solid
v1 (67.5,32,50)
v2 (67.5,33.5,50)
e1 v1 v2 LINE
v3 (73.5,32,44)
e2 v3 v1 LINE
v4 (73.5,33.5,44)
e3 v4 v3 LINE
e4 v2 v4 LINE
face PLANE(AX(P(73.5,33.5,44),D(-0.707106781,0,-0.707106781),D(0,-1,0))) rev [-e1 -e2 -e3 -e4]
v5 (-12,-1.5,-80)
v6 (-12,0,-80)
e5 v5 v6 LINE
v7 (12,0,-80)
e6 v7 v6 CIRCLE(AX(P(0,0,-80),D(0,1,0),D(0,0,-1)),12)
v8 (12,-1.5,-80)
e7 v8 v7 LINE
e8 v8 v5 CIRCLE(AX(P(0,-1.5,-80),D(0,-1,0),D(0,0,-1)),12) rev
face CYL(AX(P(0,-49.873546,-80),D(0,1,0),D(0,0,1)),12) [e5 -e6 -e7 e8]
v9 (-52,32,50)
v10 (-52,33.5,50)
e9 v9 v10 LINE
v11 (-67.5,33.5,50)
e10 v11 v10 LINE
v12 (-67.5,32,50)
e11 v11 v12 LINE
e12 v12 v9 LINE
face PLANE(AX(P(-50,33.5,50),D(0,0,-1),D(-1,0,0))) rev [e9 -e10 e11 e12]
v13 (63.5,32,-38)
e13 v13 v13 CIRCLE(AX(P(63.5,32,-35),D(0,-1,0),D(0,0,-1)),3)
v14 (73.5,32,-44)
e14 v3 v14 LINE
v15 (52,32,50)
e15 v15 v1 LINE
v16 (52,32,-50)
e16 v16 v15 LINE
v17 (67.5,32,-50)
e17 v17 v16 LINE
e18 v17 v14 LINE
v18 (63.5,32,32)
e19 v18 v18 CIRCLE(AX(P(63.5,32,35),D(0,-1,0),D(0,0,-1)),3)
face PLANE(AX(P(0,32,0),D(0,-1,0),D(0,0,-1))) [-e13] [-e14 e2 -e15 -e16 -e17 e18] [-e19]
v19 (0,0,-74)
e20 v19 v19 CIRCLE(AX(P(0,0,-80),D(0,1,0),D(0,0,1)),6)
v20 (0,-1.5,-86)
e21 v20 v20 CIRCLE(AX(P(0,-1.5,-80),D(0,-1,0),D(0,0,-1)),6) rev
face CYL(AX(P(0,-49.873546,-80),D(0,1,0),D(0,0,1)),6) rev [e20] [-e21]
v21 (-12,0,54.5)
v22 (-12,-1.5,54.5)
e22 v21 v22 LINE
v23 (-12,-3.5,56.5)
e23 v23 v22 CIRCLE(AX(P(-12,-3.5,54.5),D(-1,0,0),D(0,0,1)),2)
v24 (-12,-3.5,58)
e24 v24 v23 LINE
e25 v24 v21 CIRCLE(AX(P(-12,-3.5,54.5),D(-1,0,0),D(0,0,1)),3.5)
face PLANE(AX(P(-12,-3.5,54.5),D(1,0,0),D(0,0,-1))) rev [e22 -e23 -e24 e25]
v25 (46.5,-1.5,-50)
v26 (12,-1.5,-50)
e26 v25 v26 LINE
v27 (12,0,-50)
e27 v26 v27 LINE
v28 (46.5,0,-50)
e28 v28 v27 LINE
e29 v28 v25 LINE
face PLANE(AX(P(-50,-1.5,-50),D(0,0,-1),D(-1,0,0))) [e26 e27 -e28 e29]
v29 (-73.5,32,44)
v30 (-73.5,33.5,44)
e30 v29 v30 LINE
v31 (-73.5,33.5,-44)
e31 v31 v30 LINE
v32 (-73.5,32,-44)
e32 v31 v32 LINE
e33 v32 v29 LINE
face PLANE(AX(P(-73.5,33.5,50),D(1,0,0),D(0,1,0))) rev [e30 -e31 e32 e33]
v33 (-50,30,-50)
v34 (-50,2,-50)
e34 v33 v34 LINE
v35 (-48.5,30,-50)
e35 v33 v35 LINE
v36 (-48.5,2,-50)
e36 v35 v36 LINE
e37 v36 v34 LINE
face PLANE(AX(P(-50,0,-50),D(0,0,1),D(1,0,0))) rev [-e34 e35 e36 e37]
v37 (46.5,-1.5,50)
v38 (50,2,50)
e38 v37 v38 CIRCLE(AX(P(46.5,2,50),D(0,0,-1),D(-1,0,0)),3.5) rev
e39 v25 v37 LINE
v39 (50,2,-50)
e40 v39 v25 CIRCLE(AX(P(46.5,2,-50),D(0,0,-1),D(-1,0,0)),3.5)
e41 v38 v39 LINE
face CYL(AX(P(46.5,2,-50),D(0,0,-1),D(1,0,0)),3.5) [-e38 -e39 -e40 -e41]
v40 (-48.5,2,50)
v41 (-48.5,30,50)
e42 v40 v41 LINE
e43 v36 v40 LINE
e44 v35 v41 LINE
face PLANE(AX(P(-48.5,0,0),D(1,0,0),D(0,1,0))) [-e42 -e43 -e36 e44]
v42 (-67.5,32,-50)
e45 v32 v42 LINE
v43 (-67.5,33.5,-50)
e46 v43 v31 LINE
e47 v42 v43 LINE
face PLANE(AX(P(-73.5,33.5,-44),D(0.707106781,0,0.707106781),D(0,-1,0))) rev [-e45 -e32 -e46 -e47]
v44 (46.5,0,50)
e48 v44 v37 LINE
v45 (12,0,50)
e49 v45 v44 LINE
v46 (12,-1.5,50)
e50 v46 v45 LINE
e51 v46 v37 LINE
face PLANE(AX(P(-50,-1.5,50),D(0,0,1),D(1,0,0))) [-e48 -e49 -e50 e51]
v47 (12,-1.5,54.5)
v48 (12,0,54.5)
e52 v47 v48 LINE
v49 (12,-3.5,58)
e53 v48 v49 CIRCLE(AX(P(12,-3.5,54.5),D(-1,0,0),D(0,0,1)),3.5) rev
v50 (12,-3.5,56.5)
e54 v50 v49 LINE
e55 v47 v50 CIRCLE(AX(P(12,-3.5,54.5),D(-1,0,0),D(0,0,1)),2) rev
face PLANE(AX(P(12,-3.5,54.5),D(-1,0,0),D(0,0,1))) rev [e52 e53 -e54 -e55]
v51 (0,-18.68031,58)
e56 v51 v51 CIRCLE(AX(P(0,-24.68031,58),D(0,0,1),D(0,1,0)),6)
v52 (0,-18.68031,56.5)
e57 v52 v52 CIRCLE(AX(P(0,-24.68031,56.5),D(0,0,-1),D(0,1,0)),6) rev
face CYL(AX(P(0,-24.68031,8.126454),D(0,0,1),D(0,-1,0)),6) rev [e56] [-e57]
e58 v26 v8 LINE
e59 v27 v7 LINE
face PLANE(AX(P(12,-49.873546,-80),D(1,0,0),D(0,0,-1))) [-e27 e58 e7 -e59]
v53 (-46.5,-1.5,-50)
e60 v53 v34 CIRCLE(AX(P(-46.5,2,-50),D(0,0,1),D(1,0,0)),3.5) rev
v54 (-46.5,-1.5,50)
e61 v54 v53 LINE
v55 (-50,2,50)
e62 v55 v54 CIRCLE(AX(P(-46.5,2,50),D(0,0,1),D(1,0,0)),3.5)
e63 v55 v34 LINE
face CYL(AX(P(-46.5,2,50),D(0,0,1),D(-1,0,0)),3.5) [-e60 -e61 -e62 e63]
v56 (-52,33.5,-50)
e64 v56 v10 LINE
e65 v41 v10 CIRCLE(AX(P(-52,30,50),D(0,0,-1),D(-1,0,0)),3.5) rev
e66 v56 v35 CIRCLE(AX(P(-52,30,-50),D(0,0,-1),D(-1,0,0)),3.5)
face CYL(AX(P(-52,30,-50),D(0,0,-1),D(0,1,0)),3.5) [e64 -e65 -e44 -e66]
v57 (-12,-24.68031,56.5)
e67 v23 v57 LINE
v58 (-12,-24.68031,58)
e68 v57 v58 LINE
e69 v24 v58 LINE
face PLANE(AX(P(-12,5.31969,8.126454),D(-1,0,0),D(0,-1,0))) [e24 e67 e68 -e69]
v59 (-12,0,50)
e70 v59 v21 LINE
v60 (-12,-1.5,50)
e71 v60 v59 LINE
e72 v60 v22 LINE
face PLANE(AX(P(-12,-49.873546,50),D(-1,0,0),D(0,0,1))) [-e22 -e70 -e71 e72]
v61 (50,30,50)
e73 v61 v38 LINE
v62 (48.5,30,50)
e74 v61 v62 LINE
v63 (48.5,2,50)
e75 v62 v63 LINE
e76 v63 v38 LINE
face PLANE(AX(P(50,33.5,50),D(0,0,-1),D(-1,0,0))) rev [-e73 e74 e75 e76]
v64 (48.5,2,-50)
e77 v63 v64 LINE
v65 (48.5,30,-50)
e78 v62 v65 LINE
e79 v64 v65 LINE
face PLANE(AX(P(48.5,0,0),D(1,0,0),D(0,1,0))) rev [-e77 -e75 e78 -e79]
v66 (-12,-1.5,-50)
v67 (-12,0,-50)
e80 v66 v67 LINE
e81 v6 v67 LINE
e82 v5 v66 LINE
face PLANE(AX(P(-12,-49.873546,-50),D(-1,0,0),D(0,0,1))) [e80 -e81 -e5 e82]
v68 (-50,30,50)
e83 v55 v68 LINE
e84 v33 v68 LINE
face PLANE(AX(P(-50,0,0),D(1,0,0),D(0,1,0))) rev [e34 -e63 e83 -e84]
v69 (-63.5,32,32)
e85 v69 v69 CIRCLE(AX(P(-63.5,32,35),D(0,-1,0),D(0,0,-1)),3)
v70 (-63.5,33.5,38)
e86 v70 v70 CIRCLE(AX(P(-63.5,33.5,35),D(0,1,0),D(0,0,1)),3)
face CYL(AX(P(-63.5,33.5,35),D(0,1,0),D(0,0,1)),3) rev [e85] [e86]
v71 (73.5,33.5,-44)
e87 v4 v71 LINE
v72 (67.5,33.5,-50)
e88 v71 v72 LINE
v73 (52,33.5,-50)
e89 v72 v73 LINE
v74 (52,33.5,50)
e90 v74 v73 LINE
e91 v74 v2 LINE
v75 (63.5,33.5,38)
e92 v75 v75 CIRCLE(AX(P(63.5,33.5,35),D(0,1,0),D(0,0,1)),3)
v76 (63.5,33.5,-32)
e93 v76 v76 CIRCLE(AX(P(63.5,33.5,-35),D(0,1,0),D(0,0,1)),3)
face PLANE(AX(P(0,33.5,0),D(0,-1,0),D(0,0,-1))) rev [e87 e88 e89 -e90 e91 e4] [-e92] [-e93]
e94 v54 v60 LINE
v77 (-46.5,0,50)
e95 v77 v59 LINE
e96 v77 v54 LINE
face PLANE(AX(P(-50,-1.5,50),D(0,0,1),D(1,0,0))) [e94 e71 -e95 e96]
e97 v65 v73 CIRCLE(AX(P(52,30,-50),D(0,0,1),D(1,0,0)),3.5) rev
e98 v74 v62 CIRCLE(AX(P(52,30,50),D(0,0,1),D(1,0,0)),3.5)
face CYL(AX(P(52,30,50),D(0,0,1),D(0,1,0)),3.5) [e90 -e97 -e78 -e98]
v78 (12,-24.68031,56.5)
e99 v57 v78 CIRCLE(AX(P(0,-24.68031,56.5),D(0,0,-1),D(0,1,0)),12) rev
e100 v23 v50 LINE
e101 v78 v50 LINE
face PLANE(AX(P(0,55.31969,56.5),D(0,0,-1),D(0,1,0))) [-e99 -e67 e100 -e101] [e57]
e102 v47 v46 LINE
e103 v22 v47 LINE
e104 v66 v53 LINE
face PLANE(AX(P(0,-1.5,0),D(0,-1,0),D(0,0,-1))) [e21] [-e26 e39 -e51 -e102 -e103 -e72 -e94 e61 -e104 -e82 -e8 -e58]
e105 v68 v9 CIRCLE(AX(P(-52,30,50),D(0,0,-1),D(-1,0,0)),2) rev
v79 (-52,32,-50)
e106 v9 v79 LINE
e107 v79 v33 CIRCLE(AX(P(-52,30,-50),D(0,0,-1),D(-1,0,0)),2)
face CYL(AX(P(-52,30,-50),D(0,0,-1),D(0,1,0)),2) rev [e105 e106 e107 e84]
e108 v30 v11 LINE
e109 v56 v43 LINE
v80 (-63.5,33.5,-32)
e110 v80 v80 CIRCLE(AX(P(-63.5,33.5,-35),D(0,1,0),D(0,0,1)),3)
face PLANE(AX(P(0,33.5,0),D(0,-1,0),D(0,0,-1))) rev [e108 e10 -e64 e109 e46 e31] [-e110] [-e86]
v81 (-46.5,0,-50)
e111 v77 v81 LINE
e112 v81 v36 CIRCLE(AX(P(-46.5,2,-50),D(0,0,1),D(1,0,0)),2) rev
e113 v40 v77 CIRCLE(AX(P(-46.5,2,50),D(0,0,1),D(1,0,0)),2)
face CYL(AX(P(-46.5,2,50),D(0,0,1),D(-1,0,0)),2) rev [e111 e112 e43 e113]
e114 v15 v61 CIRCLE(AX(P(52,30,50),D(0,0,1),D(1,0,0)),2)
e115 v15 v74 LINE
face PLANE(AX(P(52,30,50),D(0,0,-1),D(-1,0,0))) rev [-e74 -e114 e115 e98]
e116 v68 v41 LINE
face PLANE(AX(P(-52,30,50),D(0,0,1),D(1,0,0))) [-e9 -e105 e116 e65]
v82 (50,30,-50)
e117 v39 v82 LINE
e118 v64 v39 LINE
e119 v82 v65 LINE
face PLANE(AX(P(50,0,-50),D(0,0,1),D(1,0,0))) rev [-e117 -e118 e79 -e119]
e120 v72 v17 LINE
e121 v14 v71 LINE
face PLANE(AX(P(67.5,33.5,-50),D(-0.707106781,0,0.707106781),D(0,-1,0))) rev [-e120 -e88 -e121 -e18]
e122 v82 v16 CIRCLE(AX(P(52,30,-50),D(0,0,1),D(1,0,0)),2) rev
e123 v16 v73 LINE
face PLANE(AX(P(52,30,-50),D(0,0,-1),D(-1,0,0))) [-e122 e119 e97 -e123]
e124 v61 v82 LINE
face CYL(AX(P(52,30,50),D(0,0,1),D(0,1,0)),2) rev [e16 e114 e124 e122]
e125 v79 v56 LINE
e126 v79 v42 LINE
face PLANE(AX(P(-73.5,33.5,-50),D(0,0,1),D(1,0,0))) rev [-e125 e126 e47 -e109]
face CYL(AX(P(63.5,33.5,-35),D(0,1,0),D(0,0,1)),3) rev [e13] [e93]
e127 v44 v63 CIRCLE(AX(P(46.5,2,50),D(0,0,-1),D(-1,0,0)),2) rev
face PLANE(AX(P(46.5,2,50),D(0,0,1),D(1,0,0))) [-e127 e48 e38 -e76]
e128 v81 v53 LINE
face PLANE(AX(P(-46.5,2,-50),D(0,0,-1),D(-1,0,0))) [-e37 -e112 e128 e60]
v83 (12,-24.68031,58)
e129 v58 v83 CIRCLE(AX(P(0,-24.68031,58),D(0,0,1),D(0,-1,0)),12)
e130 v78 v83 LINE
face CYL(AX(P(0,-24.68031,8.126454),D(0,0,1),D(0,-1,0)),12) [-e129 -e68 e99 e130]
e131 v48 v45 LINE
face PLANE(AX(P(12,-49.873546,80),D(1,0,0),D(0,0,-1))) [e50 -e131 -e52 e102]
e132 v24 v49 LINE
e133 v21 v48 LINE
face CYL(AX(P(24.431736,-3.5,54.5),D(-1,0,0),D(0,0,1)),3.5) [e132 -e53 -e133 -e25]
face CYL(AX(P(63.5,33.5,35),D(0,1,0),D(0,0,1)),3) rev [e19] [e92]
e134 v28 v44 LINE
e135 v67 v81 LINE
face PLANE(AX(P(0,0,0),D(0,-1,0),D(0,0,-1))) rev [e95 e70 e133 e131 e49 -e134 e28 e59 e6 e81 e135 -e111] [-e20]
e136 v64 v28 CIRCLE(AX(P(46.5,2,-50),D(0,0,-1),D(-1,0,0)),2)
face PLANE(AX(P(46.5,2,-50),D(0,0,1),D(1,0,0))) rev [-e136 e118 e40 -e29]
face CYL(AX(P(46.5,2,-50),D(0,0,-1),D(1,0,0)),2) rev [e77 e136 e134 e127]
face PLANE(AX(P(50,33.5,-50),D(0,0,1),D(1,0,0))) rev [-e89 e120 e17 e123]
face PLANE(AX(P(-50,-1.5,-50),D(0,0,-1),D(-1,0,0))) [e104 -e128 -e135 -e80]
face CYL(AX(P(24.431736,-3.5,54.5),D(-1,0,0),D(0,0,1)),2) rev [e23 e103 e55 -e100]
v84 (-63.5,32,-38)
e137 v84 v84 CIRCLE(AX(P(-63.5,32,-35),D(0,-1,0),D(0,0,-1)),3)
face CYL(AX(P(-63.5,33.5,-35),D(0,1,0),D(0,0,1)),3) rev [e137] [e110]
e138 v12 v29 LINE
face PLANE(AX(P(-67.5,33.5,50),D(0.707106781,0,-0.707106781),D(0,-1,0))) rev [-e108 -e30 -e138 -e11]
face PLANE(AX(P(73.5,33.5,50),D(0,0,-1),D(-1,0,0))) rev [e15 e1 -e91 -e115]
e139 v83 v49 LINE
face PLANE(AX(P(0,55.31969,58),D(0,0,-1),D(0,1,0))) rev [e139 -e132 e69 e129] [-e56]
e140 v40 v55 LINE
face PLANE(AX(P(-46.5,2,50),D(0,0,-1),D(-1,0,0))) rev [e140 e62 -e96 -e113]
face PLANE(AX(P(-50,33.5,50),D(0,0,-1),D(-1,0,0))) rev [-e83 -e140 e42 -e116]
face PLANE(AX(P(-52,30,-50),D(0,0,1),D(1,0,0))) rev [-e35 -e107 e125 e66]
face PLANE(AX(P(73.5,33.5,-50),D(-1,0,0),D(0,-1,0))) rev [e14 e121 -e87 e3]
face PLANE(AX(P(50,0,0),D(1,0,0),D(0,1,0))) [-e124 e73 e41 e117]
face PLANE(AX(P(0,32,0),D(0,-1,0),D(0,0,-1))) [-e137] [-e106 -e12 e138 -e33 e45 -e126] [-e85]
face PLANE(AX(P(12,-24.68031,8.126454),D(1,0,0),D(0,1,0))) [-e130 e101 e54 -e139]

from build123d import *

# Parameters (mm, degrees)
SKETCH1_W                      = 100
SKETCH1_H                      = 100
BASE_FLANGE1_DEPTH             = 1.5
EDGE_FLANGE1_STRIP_W           = 10
EDGE_FLANGE1_STRIP_H           = 1.5
EDGE_FLANGE1_STRIP_CUT_DEPTH   = 100
EDGE_FLANGE1_STRIP_2_W         = 10
EDGE_FLANGE1_STRIP_2_H         = 1.5
EDGE_FLANGE1_STRIP_CUT_2_DEPTH = 100
EDGE_FLANGE1_DEPTH             = 100
EDGE_FLANGE1_BEND_DEPTH        = 100
EDGE_FLANGE2_STRIP_W           = 10
EDGE_FLANGE2_STRIP_H           = 1.5
EDGE_FLANGE2_STRIP_CUT_DEPTH   = 100
EDGE_FLANGE2_STRIP_2_W         = 10
EDGE_FLANGE2_STRIP_2_H         = 1.5
EDGE_FLANGE2_STRIP_CUT_2_DEPTH = 100
EDGE_FLANGE2_DEPTH             = 100
EDGE_FLANGE2_BEND_DEPTH        = 100
F_6_0_6_DIAMETER_HOLE1_D       = 6
CHAMFER1_SIZE                  = 6
SKETCH20_R                     = 6
BOSS_EXTRUDE1_DEPTH            = 1.5
SKETCHED_START                 = 57.64041
SKETCHED_BEND1_OUTLINE_W       = 24
SKETCHED_BEND1_OUTLINE_H       = 1.5
SKETCHED_BEND1_DEPTH           = 35.35959
SKETCHED_START_2               = 54.5
SKETCHED_BEND1_2_OUTLINE_R     = 6
SKETCHED_BEND1_2_DEPTH         = 3.5
SKETCHED_START_3               = -12
SKETCHED_BEND1_3_DEPTH         = 24


with BuildPart() as part:
    # Base-Flange1: sheet metal written as solids
    # Sketch1 → Base-Flange1 (new body)
    with BuildSketch(Plane(origin=(0, 0, 0), x_dir=(1, 0, 0), z_dir=(0, 1, 0))):
        Rectangle(SKETCH1_W, SKETCH1_H)
    extrude(amount=-BASE_FLANGE1_DEPTH)

    # Edge-Flange1: sheet metal written as solids
    # Edge-Flange1 strip (on a plane across the edge) → Edge-Flange1 strip cut (cut)
    with BuildSketch(Plane(origin=(-50, 0, -50), x_dir=(1, 0, 0), z_dir=(0, 0, 1))):
        with Locations((-1.5, -0.75)):
            Rectangle(EDGE_FLANGE1_STRIP_W, EDGE_FLANGE1_STRIP_H)
    extrude(amount=EDGE_FLANGE1_STRIP_CUT_DEPTH, mode=Mode.SUBTRACT)

    # Edge-Flange1 strip 2 (on a plane across the edge) → Edge-Flange1 strip cut 2 (cut)
    with BuildSketch(Plane(origin=(50, 0, 50), x_dir=(-1, 0, 0), z_dir=(0, 0, -1))):
        with Locations((-1.5, -0.75)):
            Rectangle(EDGE_FLANGE1_STRIP_2_W, EDGE_FLANGE1_STRIP_2_H)
    extrude(amount=EDGE_FLANGE1_STRIP_CUT_2_DEPTH, mode=Mode.SUBTRACT)

    # Edge-Flange1 section (on a plane across the edge) → Edge-Flange1 (add)
    with BuildSketch(Plane(origin=(-50, 0, -50), x_dir=(1, 0, 0), z_dir=(0, 0, 1))):
        with BuildLine():
            Line((0, 2), (0, 33.5))
            Line((0, 33.5), (1.5, 33.5))
            Line((1.5, 33.5), (1.5, 2))
            ThreePointArc((1.5, 2), (2.085786438, 0.585786438), (3.5, 0))
            Line((3.5, 0), (3.5, -1.5))
            ThreePointArc((3.5, -1.5), (1.025126266, -0.474873734), (0, 2))
        make_face()
    extrude(amount=EDGE_FLANGE1_DEPTH)

    # Edge-Flange1 section 2 (on a plane across the edge) → Edge-Flange1 bend (add)
    with BuildSketch(Plane(origin=(50, 0, 50), x_dir=(-1, 0, 0), z_dir=(0, 0, -1))):
        with BuildLine():
            Line((0, 2), (0, 33.5))
            Line((0, 33.5), (1.5, 33.5))
            Line((1.5, 33.5), (1.5, 2))
            ThreePointArc((1.5, 2), (2.085786438, 0.585786438), (3.5, 0))
            Line((3.5, 0), (3.5, -1.5))
            ThreePointArc((3.5, -1.5), (1.025126266, -0.474873734), (0, 2))
        make_face()
    extrude(amount=EDGE_FLANGE1_BEND_DEPTH)

    # Edge-Flange2: sheet metal written as solids
    # Edge-Flange2 strip (on a plane across the edge) → Edge-Flange2 strip cut (cut)
    with BuildSketch(Plane(origin=(-50, 33.5, 50), x_dir=(0, -1, 0), z_dir=(0, 0, -1))):
        with Locations((-1.5, -0.75)):
            Rectangle(EDGE_FLANGE2_STRIP_W, EDGE_FLANGE2_STRIP_H)
    extrude(amount=EDGE_FLANGE2_STRIP_CUT_DEPTH, mode=Mode.SUBTRACT)

    # Edge-Flange2 strip 2 (on a plane across the edge) → Edge-Flange2 strip cut 2 (cut)
    with BuildSketch(Plane(origin=(50, 33.5, -50), x_dir=(0, -1, 0), z_dir=(0, 0, 1))):
        with Locations((-1.5, -0.75)):
            Rectangle(EDGE_FLANGE2_STRIP_2_W, EDGE_FLANGE2_STRIP_2_H)
    extrude(amount=EDGE_FLANGE2_STRIP_CUT_2_DEPTH, mode=Mode.SUBTRACT)

    # Edge-Flange2 section (on a plane across the edge) → Edge-Flange2 (add)
    with BuildSketch(Plane(origin=(-50, 33.5, 50), x_dir=(0, -1, 0), z_dir=(0, 0, -1))):
        with BuildLine():
            Line((0, 2), (0, 23.5))
            Line((0, 23.5), (1.5, 23.5))
            Line((1.5, 23.5), (1.5, 2))
            ThreePointArc((1.5, 2), (2.085786438, 0.585786438), (3.5, 0))
            Line((3.5, 0), (3.5, -1.5))
            ThreePointArc((3.5, -1.5), (1.025126266, -0.474873734), (0, 2))
        make_face()
    extrude(amount=EDGE_FLANGE2_DEPTH)

    # Edge-Flange2 section 2 (on a plane across the edge) → Edge-Flange2 bend (add)
    with BuildSketch(Plane(origin=(50, 33.5, -50), x_dir=(0, -1, 0), z_dir=(0, 0, 1))):
        with BuildLine():
            Line((0, 2), (0, 23.5))
            Line((0, 23.5), (1.5, 23.5))
            Line((1.5, 23.5), (1.5, 2))
            ThreePointArc((1.5, 2), (2.085786438, 0.585786438), (3.5, 0))
            Line((3.5, 0), (3.5, -1.5))
            ThreePointArc((3.5, -1.5), (1.025126266, -0.474873734), (0, 2))
        make_face()
    extrude(amount=EDGE_FLANGE2_BEND_DEPTH)

    # Ø6.0 (6) Diameter Hole1 (through all)
    with Locations(Plane(origin=(0, 33.5, 0), x_dir=(1, 0, 0), z_dir=(0, 1, 0))):
        with Locations((-63.5, 35), (-63.5, -35), (63.5, 35), (63.5, -35)):
            Hole(F_6_0_6_DIAMETER_HOLE1_D / 2)

    # Chamfer1
    chamfer1_edges = [part.edges().sort_by_distance(p)[0] for p in [
        (-73.5, 32.75, 50),
        (-73.5, 32.75, -50),
        (73.5, 32.75, -50),
        (73.5, 32.75, 50),
    ]]
    chamfer(chamfer1_edges, length=CHAMFER1_SIZE)

    # Sketch20 → Boss-Extrude1 (add)
    # profile 1 of 2: a face of its own
    with BuildSketch(Plane(origin=(0, 0, 0), x_dir=(1, 0, 0), z_dir=(0, 1, 0))):
        with BuildLine():
            Line((-12, 50), (-12, 80))
            ThreePointArc((-12, 80), (0, 92), (12, 80))
            Line((12, 80), (12, 50))
            Line((12, 50), (-12, 50))
        make_face()
        with Locations(Location((0, 80, 0), (0, 0, 270))):
            Circle(SKETCH20_R, mode=Mode.SUBTRACT)
    # profile 2 of 2: a face of its own
    with BuildSketch(Plane(origin=(0, 0, 0), x_dir=(1, 0, 0), z_dir=(0, 1, 0))):
        with BuildLine():
            Line((12, -50), (-12, -50))
            Line((-12, -50), (-12, -80))
            ThreePointArc((-12, -80), (0, -92), (12, -80))
            Line((12, -80), (12, -50))
        make_face()
        with Locations(Location((0, -80, 0), (0, 0, 90))):
            Circle(SKETCH20_R, mode=Mode.SUBTRACT)
    extrude(amount=-BOSS_EXTRUDE1_DEPTH)

    # Sketched Bend1: read off the stored shape, not the designer's step
    # Sketched Bend1 outline → Sketched Bend1 (cut)
    with BuildSketch(Plane.XY.offset(SKETCHED_START)):
        with Locations((0, -0.75)):
            Rectangle(SKETCHED_BEND1_OUTLINE_W, SKETCHED_BEND1_OUTLINE_H)
    extrude(amount=SKETCHED_BEND1_DEPTH, mode=Mode.SUBTRACT)

    # Sketched Bend1 2 outline → Sketched Bend1 2 (add)
    with BuildSketch(Plane.XY.offset(SKETCHED_START_2)):
        with BuildLine():
            Line((-12, -1.5), (-12, -24.680310101))
            ThreePointArc((-12, -24.680310101), (0, -36.680310101), (12, -24.680310101))
            Line((12, -24.680310101), (12, -1.5))
            Line((12, -1.5), (-12, -1.5))
        make_face()
        with Locations((0, -24.680310101)):
            Circle(SKETCHED_BEND1_2_OUTLINE_R, mode=Mode.SUBTRACT)
    extrude(amount=SKETCHED_BEND1_2_DEPTH)

    # Sketched Bend1 3 outline → Sketched Bend1 3 (cut)
    with BuildSketch(Plane.YZ.offset(SKETCHED_START_3)):
        with BuildLine():
            ThreePointArc((-1.5, 54.5), (-2.085786438, 55.914213562), (-3.5, 56.5))
            Line((-3.5, 56.5), (-38, 56.5))
            Line((-38, 56.5), (-38, 54.5))
            Line((-38, 54.5), (-1.5, 54.5))
        make_face()
        with BuildLine():
            Line((-38, 59), (-38, 58.000000005))
            Line((-38, 58.000000005), (-3.5, 58))
            ThreePointArc((-3.5, 58), (-1.025126266, 56.974873734), (0, 54.5))
            Line((0, 54.5), (0, 53))
            Line((0, 53), (1, 53))
            Line((1, 53), (1, 57.64041))
            Line((1, 57.64041), (-1.5, 57.64041))
            Line((-1.5, 57.64041), (-1.5, 59))
            Line((-1.5, 59), (-38, 59))
        make_face()
    extrude(amount=SKETCHED_BEND1_3_DEPTH, mode=Mode.SUBTRACT)


solid = part.part
